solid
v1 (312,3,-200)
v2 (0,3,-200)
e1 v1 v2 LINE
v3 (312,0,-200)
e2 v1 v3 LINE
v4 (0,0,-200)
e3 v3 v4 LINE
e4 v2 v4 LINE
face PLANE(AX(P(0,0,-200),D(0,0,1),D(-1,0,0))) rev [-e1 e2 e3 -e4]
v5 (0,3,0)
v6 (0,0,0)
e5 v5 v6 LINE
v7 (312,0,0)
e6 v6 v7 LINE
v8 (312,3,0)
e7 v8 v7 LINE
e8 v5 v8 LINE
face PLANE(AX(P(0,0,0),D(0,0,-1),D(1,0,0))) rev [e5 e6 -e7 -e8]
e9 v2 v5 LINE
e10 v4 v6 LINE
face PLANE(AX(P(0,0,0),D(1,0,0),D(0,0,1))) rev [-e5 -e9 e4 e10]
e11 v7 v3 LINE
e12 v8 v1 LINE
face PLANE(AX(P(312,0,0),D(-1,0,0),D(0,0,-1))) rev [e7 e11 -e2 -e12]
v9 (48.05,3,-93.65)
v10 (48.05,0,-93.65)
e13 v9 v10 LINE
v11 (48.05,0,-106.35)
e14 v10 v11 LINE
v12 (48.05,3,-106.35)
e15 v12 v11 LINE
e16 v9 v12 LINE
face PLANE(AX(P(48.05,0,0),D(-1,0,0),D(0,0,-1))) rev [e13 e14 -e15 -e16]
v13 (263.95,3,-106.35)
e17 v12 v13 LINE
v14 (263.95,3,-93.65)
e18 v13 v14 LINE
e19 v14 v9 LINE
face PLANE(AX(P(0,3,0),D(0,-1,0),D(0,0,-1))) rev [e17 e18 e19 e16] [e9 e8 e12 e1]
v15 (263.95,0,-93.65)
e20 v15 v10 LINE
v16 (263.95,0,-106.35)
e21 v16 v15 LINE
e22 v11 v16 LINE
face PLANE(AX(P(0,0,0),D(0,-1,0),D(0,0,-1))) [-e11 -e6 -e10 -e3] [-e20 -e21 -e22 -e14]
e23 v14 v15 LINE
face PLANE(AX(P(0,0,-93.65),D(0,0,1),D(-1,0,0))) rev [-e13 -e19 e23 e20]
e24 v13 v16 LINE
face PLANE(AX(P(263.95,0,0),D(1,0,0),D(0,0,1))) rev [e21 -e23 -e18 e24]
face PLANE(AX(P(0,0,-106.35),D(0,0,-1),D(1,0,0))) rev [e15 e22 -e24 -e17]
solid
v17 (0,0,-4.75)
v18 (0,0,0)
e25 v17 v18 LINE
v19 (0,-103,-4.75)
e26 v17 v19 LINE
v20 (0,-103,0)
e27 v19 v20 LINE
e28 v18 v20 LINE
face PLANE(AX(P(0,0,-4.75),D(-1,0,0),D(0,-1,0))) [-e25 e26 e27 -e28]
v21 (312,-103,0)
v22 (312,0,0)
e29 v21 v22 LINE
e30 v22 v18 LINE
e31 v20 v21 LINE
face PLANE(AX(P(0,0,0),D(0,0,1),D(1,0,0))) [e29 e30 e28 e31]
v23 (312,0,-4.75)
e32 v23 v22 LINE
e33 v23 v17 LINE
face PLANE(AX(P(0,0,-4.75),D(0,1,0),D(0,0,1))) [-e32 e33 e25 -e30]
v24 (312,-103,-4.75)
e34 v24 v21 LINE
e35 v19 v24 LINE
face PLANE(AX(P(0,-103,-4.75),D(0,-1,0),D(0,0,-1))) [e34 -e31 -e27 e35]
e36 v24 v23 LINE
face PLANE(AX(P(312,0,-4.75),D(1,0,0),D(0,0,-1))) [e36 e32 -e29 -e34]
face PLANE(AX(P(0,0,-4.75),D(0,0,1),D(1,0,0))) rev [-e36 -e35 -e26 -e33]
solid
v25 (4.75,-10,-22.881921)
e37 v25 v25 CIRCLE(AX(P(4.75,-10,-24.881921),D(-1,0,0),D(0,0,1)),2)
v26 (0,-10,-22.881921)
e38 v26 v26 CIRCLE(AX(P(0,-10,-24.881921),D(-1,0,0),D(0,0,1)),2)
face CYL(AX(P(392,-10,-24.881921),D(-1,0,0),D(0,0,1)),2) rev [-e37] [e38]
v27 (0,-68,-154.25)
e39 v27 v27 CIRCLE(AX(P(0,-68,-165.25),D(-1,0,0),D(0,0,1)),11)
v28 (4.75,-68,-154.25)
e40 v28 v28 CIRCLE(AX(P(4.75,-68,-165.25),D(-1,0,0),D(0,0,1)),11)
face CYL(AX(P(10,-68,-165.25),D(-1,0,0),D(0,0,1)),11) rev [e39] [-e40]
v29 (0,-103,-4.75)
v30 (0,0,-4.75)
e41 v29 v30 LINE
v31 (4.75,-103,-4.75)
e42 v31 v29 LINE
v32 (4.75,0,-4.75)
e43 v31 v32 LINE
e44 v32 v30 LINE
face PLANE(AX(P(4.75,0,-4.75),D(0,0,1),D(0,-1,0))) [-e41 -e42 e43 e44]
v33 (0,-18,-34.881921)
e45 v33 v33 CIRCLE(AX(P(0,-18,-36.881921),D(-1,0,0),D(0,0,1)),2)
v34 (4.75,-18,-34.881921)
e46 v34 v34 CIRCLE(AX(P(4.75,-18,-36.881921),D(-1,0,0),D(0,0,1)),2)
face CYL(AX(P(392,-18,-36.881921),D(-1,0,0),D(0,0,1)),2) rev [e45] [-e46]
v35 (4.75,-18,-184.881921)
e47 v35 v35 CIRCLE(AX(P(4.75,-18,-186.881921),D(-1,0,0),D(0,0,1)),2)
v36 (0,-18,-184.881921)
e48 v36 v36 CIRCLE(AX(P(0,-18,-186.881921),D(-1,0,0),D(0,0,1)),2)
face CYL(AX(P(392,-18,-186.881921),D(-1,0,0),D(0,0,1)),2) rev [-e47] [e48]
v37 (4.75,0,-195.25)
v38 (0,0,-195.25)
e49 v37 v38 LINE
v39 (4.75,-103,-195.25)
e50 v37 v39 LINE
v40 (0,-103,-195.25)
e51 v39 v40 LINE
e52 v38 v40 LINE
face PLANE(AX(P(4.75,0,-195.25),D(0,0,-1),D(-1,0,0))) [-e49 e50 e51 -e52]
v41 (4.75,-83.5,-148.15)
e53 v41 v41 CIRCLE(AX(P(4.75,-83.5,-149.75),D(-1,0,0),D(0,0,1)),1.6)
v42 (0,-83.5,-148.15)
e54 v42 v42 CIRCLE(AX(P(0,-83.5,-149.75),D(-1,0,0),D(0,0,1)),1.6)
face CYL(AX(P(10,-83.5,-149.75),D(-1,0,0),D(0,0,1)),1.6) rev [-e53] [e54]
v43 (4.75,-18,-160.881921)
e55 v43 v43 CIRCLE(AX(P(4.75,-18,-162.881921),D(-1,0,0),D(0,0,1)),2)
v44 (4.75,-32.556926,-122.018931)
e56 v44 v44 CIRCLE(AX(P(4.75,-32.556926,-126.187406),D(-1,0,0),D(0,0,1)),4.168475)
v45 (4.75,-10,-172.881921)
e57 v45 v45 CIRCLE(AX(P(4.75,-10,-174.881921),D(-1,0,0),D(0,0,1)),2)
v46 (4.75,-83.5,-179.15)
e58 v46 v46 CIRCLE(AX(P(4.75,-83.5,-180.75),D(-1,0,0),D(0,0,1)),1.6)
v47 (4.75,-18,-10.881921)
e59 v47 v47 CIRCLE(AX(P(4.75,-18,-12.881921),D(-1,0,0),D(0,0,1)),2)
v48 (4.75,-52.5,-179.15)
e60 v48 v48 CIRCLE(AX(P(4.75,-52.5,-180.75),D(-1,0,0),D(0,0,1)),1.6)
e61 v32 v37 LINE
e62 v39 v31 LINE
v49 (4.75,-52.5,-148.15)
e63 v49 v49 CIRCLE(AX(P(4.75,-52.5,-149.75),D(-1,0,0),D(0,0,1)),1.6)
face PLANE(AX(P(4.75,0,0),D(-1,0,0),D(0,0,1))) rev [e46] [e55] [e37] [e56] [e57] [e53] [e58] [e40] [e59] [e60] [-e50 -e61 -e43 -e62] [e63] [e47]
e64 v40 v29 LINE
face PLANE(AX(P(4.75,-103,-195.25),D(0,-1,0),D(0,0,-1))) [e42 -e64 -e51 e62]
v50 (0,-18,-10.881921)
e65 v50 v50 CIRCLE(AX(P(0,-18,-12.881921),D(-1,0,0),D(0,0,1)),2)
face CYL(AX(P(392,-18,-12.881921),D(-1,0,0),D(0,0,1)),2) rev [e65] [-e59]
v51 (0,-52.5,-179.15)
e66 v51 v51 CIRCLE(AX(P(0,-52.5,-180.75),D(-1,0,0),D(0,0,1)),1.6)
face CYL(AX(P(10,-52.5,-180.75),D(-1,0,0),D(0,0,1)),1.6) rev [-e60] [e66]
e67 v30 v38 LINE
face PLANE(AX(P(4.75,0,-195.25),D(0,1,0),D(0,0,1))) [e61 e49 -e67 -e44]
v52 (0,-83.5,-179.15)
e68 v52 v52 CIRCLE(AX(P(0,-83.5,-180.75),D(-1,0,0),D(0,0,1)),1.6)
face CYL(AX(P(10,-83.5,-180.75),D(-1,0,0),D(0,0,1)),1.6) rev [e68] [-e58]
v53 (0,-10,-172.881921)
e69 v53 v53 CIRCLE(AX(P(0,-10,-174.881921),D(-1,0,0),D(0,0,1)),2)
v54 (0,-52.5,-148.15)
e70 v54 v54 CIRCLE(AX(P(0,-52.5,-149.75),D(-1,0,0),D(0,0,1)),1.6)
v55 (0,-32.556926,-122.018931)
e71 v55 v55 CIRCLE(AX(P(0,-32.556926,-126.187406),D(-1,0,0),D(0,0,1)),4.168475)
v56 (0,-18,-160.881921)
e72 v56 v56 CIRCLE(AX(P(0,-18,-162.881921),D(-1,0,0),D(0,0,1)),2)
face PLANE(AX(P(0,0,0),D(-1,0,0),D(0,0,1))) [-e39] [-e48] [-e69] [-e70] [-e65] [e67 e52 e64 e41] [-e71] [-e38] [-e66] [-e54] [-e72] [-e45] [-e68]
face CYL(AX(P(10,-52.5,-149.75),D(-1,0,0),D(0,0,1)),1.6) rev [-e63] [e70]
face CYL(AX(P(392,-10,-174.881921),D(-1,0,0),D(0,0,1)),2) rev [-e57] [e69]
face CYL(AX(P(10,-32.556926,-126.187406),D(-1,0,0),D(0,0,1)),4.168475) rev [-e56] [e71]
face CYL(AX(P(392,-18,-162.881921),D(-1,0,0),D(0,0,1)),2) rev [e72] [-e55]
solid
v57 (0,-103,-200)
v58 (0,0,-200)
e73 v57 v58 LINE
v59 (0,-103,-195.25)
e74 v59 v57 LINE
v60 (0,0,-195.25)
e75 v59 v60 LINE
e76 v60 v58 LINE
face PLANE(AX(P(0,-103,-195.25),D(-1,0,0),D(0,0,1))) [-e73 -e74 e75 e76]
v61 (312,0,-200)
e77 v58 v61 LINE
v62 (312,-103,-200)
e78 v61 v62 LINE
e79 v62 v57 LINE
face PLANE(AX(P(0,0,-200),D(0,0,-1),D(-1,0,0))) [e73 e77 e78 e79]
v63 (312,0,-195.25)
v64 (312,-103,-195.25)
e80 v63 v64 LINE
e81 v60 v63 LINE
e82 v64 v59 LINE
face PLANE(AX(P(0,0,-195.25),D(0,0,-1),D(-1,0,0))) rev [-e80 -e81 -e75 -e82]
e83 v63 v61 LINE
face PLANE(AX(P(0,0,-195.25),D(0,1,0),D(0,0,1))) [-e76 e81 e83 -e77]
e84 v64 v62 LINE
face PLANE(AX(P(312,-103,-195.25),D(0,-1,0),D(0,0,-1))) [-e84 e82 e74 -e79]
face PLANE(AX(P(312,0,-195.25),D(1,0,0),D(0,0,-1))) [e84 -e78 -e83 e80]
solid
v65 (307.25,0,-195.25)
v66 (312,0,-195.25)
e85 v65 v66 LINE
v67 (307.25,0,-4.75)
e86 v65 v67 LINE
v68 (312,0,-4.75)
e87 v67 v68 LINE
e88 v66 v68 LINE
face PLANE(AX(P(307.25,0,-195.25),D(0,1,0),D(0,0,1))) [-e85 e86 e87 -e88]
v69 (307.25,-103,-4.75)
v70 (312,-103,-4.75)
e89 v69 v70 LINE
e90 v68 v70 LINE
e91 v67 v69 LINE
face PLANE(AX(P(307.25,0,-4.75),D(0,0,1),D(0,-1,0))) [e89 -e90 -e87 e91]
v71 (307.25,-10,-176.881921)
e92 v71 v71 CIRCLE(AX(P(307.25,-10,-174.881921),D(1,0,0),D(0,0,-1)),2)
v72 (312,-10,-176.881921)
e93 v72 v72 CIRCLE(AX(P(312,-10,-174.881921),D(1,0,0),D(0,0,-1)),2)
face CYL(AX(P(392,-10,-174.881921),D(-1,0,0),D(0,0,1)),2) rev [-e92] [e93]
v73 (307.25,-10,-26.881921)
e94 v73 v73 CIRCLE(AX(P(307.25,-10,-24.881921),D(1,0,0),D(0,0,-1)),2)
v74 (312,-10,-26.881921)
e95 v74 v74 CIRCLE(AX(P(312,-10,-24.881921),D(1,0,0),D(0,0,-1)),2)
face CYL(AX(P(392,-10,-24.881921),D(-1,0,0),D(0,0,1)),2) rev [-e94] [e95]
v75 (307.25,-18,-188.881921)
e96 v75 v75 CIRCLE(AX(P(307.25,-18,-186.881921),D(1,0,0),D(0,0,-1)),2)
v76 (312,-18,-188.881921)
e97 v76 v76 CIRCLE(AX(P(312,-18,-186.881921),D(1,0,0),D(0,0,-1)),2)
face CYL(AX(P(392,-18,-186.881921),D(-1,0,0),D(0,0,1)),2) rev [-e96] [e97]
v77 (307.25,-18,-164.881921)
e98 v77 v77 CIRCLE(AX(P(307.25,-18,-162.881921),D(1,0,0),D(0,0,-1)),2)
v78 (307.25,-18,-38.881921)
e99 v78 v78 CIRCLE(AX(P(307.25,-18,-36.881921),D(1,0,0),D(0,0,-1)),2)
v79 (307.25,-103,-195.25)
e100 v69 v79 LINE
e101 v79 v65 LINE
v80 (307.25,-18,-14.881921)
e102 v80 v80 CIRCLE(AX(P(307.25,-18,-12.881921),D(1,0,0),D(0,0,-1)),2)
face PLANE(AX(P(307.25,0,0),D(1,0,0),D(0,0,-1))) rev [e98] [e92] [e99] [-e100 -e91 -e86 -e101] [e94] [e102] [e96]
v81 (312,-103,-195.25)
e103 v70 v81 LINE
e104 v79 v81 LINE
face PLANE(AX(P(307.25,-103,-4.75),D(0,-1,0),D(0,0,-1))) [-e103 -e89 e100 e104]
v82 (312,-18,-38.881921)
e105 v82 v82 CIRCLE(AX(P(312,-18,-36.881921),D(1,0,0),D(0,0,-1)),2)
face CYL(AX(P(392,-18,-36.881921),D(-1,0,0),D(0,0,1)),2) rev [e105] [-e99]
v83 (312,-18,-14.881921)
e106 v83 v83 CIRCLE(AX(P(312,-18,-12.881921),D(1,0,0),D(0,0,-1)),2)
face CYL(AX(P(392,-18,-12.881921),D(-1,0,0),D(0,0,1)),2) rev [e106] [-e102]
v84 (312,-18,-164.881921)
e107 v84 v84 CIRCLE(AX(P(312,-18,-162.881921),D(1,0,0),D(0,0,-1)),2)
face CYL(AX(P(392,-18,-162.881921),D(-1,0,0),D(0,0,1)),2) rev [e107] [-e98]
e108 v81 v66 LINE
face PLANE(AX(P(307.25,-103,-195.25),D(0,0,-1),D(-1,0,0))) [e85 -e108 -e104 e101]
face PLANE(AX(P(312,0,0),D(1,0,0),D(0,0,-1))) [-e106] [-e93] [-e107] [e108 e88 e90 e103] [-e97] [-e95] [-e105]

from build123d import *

# Parameters (mm, degrees)
SKETCH1_W                    = 312
SKETCH1_H                    = 200
BOSS_EXTRUDE1_DEPTH          = 4.75
SKETCH2_W                    = 215.9
SKETCH2_H                    = 12.7
CUT_EXTRUDE6_DEPTH           = 10
SKETCH3_R                    = 1.55
SKETCH3_R_2                  = 1.905
CUT_EXTRUDE2_DEPTH           = 3.81
CONVERT_SOLID1_START         = 3
CONVERT_SOLID1_OUTLINE_W     = 312
CONVERT_SOLID1_OUTLINE_H     = 200
CONVERT_SOLID1_OUTLINE_R     = 1.55
CONVERT_SOLID1_OUTLINE_R_2   = 1.905
CONVERT_SOLID1_OUTLINE_W_2   = 215.9
CONVERT_SOLID1_OUTLINE_H_2   = 12.7
CONVERT_SOLID1_DEPTH         = 1.75
CONVERT_SOLID1_START_2       = 0.94
CONVERT_SOLID1_2_OUTLINE_R   = 1.55
CONVERT_SOLID1_2_OUTLINE_R_2 = 1.905
CONVERT_SOLID1_2_DEPTH       = 2.06
SKETCH25_W                   = 312
SKETCH25_H                   = 103
BOSS_EXTRUDE3_DEPTH          = 4.75
SKETCH26_W                   = 312
SKETCH26_H                   = 103
BOSS_EXTRUDE4_DEPTH          = 4.75
SKETCH27_W                   = 190.5
SKETCH27_H                   = 103
BOSS_EXTRUDE5_DEPTH          = 4.75
SKETCH28_W                   = 190.5
SKETCH28_H                   = 103
BOSS_EXTRUDE6_DEPTH          = 4.75
SKETCH30_R                   = 11
SKETCH30_R_2                 = 1.6
SKETCH30_R_3                 = 4.168475053
CUT_EXTRUDE7_DEPTH           = 10
SKETCH32_R                   = 2
CUT_EXTRUDE8_DEPTH           = 392


# Read off the part's stored shape, not the designer's step: Convert-Solid1
with BuildPart() as part:
    # Sketch1 → Boss-Extrude1 (new body)
    with BuildSketch(Plane(origin=(0, 0, 0), x_dir=(1, 0, 0), z_dir=(0, 1, 0))):
        with Locations((156, 100)):
            Rectangle(SKETCH1_W, SKETCH1_H)
    extrude(amount=BOSS_EXTRUDE1_DEPTH)

    # Sketch2 → Cut-Extrude6 (cut)
    with BuildSketch(Plane(origin=(0, 4.75, 0), x_dir=(1, 0, 0), z_dir=(0, 1, 0))):
        with Locations((156, 100)):
            Rectangle(SKETCH2_W, SKETCH2_H)
    extrude(amount=-CUT_EXTRUDE6_DEPTH, mode=Mode.SUBTRACT)

    # Sketch3 → Cut-Extrude2 (cut)
    with BuildSketch(Plane(origin=(0, 4.75, 0), x_dir=(1, 0, 0), z_dir=(0, 1, 0))):
        with Locations(Location((43.605, 65, 0), (0, 0, 270))):
            Circle(SKETCH3_R)
        with Locations(Location((43.605, 135, 0), (0, 0, 270))):
            Circle(SKETCH3_R_2)
        with Locations(Location((268.395, 135, 0), (0, 0, 270))):
            Circle(SKETCH3_R_2)
        with Locations(Location((268.395, 65, 0), (0, 0, 270))):
            Circle(SKETCH3_R)
    extrude(amount=-CUT_EXTRUDE2_DEPTH, mode=Mode.SUBTRACT)

    # Convert-Solid1 outline → Convert-Solid1 (cut)
    with BuildSketch(Plane(origin=(0, 0, 0), x_dir=(1, 0, 0), z_dir=(0, 1, 0)).offset(CONVERT_SOLID1_START)):
        with Locations((156, 100)):
            Rectangle(CONVERT_SOLID1_OUTLINE_W, CONVERT_SOLID1_OUTLINE_H)
        with Locations((43.605, 65)):
            Circle(CONVERT_SOLID1_OUTLINE_R, mode=Mode.SUBTRACT)
        with Locations((268.395, 65)):
            Circle(CONVERT_SOLID1_OUTLINE_R, mode=Mode.SUBTRACT)
        with Locations((43.605, 135)):
            Circle(CONVERT_SOLID1_OUTLINE_R_2, mode=Mode.SUBTRACT)
        with Locations((156, 100)):
            Rectangle(CONVERT_SOLID1_OUTLINE_W_2, CONVERT_SOLID1_OUTLINE_H_2, mode=Mode.SUBTRACT)
        with Locations((268.395, 135)):
            Circle(CONVERT_SOLID1_OUTLINE_R_2, mode=Mode.SUBTRACT)
    extrude(amount=CONVERT_SOLID1_DEPTH, mode=Mode.SUBTRACT)

    # Convert-Solid1 2 outline → Convert-Solid1 2 (add)
    with BuildSketch(Plane(origin=(0, 0, 0), x_dir=(1, 0, 0), z_dir=(0, 1, 0)).offset(CONVERT_SOLID1_START_2)):
        with Locations((43.605, 65)):
            Circle(CONVERT_SOLID1_2_OUTLINE_R)
        with Locations((43.605, 135)):
            Circle(CONVERT_SOLID1_2_OUTLINE_R_2)
        with Locations((268.395, 135)):
            Circle(CONVERT_SOLID1_2_OUTLINE_R_2)
        with Locations((268.395, 65)):
            Circle(CONVERT_SOLID1_2_OUTLINE_R)
    extrude(amount=CONVERT_SOLID1_2_DEPTH)


with BuildPart() as body_2:
    # Sketch25 → Boss-Extrude3 (new body)
    with BuildSketch(Plane.XY):
        with Locations((156, -51.5)):
            Rectangle(SKETCH25_W, SKETCH25_H)
    extrude(amount=-BOSS_EXTRUDE3_DEPTH)


with BuildPart() as body_3:
    # Sketch26 → Boss-Extrude4 (new body)
    with BuildSketch(Plane(origin=(0, 0, -200), x_dir=(-1, 0, 0), z_dir=(0, 0, -1))):
        with Locations((-156, -51.5)):
            Rectangle(SKETCH26_W, SKETCH26_H)
    extrude(amount=-BOSS_EXTRUDE4_DEPTH)


with BuildPart() as body_4:
    # Sketch27 → Boss-Extrude5 (new body)
    with BuildSketch(Plane.ZY):
        with Locations((-100, -51.5)):
            Rectangle(SKETCH27_W, SKETCH27_H)
    extrude(amount=-BOSS_EXTRUDE5_DEPTH)

    # Sketch30 → Cut-Extrude7 (cut)
    with BuildSketch(Plane.ZY):
        with Locations((-165.25, -68)):
            Circle(SKETCH30_R)
        with Locations((-149.75, -52.5)):
            Circle(SKETCH30_R_2)
        with Locations((-180.75, -52.5)):
            Circle(SKETCH30_R_2)
        with Locations((-126.187406099, -32.55692629)):
            Circle(SKETCH30_R_3)
        with Locations((-180.75, -83.5)):
            Circle(SKETCH30_R_2)
        with Locations((-149.75, -83.5)):
            Circle(SKETCH30_R_2)
    extrude(amount=-CUT_EXTRUDE7_DEPTH, mode=Mode.SUBTRACT)


with BuildPart() as body_5:
    # Sketch28 → Boss-Extrude6 (new body)
    with BuildSketch(Plane(origin=(312, 0, 0), x_dir=(0, 0, -1), z_dir=(1, 0, 0))):
        with Locations((100, -51.5)):
            Rectangle(SKETCH28_W, SKETCH28_H)
    extrude(amount=-BOSS_EXTRUDE6_DEPTH)


with BuildPart() as cut_extrude8_tool:
    # Sketch32 → Cut-Extrude8 (new body)
    with BuildSketch(Plane.ZY):
        with Locations(Location((-174.881920661, -10, 0), (0, 0, 180))):
            Circle(SKETCH32_R)
        with Locations(Location((-162.881920661, -18, 0), (0, 0, 180))):
            Circle(SKETCH32_R)
        with Locations(Location((-24.881920661, -10, 0), (0, 0, 180))):
            Circle(SKETCH32_R)
        with Locations(Location((-36.881920661, -18, 0), (0, 0, 180))):
            Circle(SKETCH32_R)
        with Locations(Location((-12.881920661, -18, 0), (0, 0, 180))):
            Circle(SKETCH32_R)
        with Locations(Location((-186.881920661, -18, 0), (0, 0, 180))):
            Circle(SKETCH32_R)
    extrude(amount=-CUT_EXTRUDE8_DEPTH)


with BuildPart() as body_4_1:
    add(body_4.part)

    # Cut-Extrude8: cut by cut_extrude8_tool
    add(cut_extrude8_tool.part, mode=Mode.SUBTRACT)


with BuildPart() as body_5_1:
    add(body_5.part)

    # Cut-Extrude8: cut by cut_extrude8_tool
    add(cut_extrude8_tool.part, mode=Mode.SUBTRACT)


solid = Compound([part.part, body_2.part, body_3.part, body_4_1.part, body_5_1.part])
